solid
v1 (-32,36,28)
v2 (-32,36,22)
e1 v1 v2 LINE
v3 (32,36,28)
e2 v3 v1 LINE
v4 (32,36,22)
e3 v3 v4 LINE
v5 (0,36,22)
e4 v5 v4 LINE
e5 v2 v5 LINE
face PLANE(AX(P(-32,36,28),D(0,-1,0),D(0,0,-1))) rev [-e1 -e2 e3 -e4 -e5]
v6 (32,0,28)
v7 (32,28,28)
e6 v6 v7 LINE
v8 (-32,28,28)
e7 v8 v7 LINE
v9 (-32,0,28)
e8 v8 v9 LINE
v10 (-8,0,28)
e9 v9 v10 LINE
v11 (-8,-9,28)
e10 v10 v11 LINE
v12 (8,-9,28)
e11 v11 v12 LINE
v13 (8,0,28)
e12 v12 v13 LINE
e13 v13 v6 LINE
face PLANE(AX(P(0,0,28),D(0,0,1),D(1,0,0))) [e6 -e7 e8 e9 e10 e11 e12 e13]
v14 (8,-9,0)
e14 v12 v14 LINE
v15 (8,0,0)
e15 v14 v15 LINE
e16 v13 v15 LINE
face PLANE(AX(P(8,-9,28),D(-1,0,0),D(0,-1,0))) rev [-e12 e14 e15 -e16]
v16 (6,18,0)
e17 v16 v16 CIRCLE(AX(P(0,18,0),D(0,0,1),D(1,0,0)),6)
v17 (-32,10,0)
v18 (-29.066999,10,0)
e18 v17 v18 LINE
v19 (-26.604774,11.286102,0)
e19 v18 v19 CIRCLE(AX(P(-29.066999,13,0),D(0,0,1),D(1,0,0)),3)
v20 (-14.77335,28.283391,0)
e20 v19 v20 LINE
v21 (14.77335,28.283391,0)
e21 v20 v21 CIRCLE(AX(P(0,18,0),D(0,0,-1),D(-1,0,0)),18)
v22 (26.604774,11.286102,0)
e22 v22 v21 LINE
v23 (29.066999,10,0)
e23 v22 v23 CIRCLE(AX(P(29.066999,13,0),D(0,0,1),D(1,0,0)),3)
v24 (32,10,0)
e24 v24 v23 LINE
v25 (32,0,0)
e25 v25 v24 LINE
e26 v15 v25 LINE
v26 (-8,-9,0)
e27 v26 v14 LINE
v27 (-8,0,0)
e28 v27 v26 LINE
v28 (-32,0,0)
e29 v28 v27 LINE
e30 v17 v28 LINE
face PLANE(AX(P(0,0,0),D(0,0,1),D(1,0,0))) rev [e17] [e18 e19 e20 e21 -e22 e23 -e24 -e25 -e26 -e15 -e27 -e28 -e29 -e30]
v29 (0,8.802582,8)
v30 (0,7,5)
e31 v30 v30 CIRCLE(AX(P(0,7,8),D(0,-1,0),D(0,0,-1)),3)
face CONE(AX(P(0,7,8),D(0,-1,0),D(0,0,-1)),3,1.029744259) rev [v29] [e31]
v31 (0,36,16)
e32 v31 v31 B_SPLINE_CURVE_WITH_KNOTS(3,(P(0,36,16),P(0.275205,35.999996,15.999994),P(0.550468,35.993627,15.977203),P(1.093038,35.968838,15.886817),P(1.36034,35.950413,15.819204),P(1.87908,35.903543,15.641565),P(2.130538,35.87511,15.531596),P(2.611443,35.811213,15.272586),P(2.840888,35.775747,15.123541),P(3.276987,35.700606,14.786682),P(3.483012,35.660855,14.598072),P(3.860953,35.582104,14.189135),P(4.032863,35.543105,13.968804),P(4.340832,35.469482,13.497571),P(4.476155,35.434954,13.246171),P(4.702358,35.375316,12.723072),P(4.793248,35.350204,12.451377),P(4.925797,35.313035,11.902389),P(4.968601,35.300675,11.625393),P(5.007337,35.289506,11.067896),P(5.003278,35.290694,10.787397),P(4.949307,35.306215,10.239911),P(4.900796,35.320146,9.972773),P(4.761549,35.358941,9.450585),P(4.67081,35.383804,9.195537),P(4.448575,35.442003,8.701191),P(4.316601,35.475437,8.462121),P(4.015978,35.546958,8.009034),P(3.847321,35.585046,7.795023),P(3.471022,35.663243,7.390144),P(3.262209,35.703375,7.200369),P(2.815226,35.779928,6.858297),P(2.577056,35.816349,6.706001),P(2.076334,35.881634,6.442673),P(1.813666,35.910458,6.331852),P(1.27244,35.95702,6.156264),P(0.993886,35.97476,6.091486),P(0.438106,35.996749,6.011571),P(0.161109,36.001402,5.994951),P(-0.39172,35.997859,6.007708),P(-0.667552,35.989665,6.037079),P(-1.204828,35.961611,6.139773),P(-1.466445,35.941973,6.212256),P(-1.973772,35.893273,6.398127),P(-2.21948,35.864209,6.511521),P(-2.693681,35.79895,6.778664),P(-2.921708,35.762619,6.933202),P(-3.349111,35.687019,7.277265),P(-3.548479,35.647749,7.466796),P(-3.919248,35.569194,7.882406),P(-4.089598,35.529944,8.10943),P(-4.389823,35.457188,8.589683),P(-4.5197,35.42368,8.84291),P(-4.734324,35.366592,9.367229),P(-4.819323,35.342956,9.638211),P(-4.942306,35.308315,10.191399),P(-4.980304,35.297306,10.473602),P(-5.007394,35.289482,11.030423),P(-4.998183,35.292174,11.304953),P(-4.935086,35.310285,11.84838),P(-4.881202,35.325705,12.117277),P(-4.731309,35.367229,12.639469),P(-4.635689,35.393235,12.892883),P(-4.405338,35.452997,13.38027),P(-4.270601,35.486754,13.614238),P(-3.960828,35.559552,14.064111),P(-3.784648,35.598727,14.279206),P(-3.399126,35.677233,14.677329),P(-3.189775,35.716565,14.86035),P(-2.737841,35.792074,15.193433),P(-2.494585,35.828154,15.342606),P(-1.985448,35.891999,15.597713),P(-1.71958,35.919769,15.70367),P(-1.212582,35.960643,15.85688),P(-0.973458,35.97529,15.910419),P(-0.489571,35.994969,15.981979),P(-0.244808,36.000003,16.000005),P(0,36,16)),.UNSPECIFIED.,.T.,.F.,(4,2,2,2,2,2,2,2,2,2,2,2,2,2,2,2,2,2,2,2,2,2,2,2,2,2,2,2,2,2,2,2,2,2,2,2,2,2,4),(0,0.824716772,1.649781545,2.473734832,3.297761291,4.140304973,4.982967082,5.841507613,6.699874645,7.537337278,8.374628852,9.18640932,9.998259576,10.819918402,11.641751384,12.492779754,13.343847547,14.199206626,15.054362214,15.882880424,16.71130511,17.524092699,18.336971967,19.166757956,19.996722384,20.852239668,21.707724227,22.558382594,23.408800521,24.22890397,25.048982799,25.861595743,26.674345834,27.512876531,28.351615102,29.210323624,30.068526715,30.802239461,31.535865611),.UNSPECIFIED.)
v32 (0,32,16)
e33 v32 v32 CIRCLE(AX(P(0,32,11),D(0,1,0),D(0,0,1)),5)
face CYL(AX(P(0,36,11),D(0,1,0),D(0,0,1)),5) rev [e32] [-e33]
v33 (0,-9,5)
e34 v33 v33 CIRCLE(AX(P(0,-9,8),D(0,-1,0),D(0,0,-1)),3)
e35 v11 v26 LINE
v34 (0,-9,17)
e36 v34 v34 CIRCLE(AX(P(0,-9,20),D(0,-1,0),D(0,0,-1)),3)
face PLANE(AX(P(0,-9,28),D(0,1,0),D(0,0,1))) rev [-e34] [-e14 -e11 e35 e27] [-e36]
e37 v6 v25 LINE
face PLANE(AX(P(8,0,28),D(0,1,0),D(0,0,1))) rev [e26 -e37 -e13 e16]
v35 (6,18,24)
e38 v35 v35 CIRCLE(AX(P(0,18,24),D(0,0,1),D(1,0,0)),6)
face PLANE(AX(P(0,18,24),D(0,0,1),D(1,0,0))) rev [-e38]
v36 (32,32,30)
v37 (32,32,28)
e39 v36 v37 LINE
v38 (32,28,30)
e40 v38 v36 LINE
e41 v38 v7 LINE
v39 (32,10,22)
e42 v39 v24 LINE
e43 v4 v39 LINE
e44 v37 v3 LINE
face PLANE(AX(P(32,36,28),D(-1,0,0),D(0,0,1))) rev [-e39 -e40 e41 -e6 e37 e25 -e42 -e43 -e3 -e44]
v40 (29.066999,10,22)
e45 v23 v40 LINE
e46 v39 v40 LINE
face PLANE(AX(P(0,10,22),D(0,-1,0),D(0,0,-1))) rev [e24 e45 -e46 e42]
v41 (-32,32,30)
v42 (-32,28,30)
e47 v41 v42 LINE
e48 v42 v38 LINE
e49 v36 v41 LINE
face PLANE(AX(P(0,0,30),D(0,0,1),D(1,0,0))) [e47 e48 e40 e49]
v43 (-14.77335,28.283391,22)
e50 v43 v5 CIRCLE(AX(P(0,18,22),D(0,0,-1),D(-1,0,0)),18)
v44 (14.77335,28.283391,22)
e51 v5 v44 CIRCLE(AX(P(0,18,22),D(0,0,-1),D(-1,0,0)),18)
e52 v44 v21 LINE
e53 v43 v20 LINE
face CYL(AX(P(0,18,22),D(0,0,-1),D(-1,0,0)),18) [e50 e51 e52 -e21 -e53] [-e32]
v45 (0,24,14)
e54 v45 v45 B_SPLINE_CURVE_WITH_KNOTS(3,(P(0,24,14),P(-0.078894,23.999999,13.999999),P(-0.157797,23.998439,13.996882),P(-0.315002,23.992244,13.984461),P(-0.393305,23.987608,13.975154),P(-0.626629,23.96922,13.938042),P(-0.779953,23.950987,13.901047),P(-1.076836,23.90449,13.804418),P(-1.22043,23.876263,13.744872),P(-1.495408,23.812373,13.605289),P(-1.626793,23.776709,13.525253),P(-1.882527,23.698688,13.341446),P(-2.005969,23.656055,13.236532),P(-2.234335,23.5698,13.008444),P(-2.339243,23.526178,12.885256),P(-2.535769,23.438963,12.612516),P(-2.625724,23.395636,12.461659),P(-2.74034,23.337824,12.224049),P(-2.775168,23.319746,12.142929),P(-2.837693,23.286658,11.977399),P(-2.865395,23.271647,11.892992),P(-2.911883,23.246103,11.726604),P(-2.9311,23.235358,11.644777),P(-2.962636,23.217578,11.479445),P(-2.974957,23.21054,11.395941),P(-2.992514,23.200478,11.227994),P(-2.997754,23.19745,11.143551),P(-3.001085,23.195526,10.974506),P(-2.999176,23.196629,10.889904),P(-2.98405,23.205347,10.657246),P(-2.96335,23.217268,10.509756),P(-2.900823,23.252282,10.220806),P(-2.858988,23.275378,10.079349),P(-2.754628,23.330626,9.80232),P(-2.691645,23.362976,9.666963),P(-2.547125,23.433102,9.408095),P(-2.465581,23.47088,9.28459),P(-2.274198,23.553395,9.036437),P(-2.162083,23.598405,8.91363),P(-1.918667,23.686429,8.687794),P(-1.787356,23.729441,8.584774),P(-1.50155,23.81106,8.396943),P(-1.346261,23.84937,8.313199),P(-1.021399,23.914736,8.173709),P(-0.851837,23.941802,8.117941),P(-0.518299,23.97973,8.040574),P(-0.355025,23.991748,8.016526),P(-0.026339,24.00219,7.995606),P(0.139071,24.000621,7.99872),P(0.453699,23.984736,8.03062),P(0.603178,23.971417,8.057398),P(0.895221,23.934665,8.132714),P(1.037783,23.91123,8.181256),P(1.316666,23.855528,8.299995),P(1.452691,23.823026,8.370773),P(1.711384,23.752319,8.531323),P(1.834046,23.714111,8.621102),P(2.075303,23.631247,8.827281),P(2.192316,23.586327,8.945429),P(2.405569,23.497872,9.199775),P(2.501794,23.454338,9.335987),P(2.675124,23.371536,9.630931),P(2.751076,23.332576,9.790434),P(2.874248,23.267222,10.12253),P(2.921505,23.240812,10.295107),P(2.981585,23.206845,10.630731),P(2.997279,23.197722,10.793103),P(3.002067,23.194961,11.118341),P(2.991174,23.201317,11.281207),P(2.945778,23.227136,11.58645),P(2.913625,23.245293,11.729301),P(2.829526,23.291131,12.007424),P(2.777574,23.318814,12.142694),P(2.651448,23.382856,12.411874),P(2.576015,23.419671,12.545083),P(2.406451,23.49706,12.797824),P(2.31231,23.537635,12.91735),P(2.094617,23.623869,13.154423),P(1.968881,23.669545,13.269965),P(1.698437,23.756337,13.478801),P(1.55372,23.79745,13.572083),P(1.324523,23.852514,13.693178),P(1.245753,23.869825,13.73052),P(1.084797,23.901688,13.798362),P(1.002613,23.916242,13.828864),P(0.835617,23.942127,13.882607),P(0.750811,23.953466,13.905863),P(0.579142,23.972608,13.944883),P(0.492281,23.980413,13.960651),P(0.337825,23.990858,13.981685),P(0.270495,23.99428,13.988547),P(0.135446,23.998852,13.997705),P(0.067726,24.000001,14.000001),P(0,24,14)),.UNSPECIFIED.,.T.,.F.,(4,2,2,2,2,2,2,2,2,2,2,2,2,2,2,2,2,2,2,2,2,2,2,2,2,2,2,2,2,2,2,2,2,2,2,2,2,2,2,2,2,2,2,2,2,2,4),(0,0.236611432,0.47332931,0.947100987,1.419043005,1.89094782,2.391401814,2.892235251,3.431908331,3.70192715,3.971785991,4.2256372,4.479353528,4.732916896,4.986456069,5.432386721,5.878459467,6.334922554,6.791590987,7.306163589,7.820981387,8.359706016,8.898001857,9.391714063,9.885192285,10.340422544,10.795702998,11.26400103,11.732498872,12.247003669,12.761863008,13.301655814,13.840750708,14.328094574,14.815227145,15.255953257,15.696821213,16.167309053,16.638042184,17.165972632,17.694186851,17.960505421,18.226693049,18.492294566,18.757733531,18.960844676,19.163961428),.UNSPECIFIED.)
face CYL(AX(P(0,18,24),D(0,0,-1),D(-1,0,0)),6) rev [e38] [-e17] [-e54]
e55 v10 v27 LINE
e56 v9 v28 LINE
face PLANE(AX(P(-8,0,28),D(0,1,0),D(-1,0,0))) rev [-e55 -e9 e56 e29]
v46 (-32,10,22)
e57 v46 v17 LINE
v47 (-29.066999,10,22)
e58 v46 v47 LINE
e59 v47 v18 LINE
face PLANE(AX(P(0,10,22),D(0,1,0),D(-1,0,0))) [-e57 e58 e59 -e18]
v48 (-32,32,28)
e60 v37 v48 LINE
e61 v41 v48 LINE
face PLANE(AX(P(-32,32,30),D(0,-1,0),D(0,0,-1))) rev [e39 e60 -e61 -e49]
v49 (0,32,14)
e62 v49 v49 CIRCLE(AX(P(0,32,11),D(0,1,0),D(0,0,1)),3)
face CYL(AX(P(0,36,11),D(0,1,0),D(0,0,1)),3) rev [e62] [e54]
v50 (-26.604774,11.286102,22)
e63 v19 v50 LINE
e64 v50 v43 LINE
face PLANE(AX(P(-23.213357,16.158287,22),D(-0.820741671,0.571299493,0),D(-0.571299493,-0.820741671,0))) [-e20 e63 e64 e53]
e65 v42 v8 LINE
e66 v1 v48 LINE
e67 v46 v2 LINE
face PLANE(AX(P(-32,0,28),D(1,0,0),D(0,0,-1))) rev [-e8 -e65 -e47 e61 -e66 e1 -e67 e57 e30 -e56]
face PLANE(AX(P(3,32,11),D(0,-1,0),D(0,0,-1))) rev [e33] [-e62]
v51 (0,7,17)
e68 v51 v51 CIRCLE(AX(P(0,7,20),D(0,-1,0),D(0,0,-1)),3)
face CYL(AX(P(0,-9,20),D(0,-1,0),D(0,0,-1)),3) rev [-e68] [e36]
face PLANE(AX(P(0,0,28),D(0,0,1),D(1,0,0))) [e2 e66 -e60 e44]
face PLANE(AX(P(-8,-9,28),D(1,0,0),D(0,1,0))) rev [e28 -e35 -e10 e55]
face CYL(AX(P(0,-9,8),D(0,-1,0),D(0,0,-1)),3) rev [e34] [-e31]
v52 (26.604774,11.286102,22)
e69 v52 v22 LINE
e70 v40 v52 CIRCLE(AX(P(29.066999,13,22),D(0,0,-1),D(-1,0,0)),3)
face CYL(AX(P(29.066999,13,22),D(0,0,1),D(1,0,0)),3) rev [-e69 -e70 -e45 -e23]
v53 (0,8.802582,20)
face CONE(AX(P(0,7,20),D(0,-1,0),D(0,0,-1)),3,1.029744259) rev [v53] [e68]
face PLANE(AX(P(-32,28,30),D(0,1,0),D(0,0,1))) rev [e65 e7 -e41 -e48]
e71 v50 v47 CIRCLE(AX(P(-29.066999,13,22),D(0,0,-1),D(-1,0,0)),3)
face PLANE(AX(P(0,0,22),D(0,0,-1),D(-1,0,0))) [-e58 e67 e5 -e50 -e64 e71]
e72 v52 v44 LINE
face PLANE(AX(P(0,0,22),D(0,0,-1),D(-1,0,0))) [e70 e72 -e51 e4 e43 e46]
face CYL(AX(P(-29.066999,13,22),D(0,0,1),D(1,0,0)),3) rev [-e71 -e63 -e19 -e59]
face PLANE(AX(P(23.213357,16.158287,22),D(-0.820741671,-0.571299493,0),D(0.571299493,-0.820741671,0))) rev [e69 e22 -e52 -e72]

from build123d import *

# Parameters (mm, degrees)
BOSS_EXTRUDE2_DEPTH       = 28
SKETCH5_R                 = 6
CUT_EXTRUDE1_DEPTH        = 24
CUT_EXTRUDE3_DEPTH        = 22
HOLE1_START               = 23.196151292
HOLE1_OUTLINE_R           = 3
HOLE1_DEPTH               = 12.803848708
HOLE1_START_2             = 32
HOLE1_2_OUTLINE_R         = 5
HOLE1_2_OUTLINE_R_2       = 3
HOLE1_2_DEPTH             = 4
F_6_0MM_DOWEL_HOLE2_D     = 6
F_6_0MM_DOWEL_HOLE2_DEPTH = 16
F_6_0MM_DOWEL_HOLE2_TIP   = 1.802581857
FILLET1_R                 = 3
SKETCH19_W                = 64
SKETCH19_H                = 4
BOSS_EXTRUDE3_DEPTH       = 2


# Read off the part's stored shape, not the designer's step: Hole1
with BuildPart() as part:
    # Sketch2 → Boss-Extrude2 (new body)
    with BuildSketch(Plane.XY):
        Polygon((0, -9), (-8, -9), (-8, 0), (-32, 0), (-32, 36), (32, 36), (32, 0), (8, 0), (8, -9), align=None)
    extrude(amount=BOSS_EXTRUDE2_DEPTH)

    # Sketch5 → Cut-Extrude1 (cut)
    with BuildSketch(Plane.XY):
        with Locations((0, 18)):
            Circle(SKETCH5_R)
    extrude(amount=CUT_EXTRUDE1_DEPTH, mode=Mode.SUBTRACT)

    # Sketch6 → Cut-Extrude3 (cut)
    with BuildSketch(Plane(origin=(0, 0, 0), x_dir=(-1, 0, 0), z_dir=(0, 0, -1))):
        with BuildLine():
            Line((-32, 36), (-32, 10))
            Line((-32, 10), (-27.5, 10))
            Line((-27.5, 10), (-14.77335007, 28.283390866))
            ThreePointArc((-14.77335007, 28.283390866), (-8.333635583, 33.954639387), (2.5e-08, 36))
            Line((2.5e-08, 36), (-32, 36))
        make_face()
        with BuildLine():
            Line((32, 36), (2.5e-08, 36))
            ThreePointArc((2.5e-08, 36), (8.333635604, 33.954639376), (14.77335007, 28.283390866))
            Line((14.77335007, 28.283390866), (27.5, 10))
            Line((27.5, 10), (32, 10))
            Line((32, 10), (32, 36))
        make_face()
    extrude(amount=-CUT_EXTRUDE3_DEPTH, mode=Mode.SUBTRACT)

    # Hole1 outline → Hole1 (cut)
    with BuildSketch(Plane(origin=(0, 0, 0), x_dir=(1, 0, 0), z_dir=(0, 1, 0)).offset(HOLE1_START)):
        with Locations((0, -11)):
            Circle(HOLE1_OUTLINE_R)
    extrude(amount=HOLE1_DEPTH, mode=Mode.SUBTRACT)

    # Hole1 2 outline → Hole1 2 (cut)
    with BuildSketch(Plane(origin=(0, 0, 0), x_dir=(1, 0, 0), z_dir=(0, 1, 0)).offset(HOLE1_START_2)):
        with Locations((0, -11)):
            Circle(HOLE1_2_OUTLINE_R)
        with Locations((0, -11)):
            Circle(HOLE1_2_OUTLINE_R_2, mode=Mode.SUBTRACT)
    extrude(amount=HOLE1_2_DEPTH, mode=Mode.SUBTRACT)

    # Ø6.0mm Dowel Hole2
    with Locations(Plane(origin=(0, -9, 0), x_dir=(-1, 0, 0), z_dir=(0, -1, 0))):
        with Locations((0, -20), (0, -8)):
            Hole(F_6_0MM_DOWEL_HOLE2_D / 2, depth=F_6_0MM_DOWEL_HOLE2_DEPTH)
            with Locations((0, 0, -(F_6_0MM_DOWEL_HOLE2_DEPTH + F_6_0MM_DOWEL_HOLE2_TIP / 2))):  # 118° drill point
                Cone(0, F_6_0MM_DOWEL_HOLE2_D / 2, F_6_0MM_DOWEL_HOLE2_TIP, mode=Mode.SUBTRACT)

    # Fillet1
    fillet1_edges = [part.edges().sort_by_distance(p)[0] for p in [
        (27.5, 10, 11),
        (-27.5, 10, 11),
    ]]
    fillet(fillet1_edges, radius=FILLET1_R)

    # Sketch19 → Boss-Extrude3 (add)
    with BuildSketch(Plane.XY.offset(28)):
        with Locations((0, 30)):
            Rectangle(SKETCH19_W, SKETCH19_H)
    extrude(amount=BOSS_EXTRUDE3_DEPTH)


solid = part.part
